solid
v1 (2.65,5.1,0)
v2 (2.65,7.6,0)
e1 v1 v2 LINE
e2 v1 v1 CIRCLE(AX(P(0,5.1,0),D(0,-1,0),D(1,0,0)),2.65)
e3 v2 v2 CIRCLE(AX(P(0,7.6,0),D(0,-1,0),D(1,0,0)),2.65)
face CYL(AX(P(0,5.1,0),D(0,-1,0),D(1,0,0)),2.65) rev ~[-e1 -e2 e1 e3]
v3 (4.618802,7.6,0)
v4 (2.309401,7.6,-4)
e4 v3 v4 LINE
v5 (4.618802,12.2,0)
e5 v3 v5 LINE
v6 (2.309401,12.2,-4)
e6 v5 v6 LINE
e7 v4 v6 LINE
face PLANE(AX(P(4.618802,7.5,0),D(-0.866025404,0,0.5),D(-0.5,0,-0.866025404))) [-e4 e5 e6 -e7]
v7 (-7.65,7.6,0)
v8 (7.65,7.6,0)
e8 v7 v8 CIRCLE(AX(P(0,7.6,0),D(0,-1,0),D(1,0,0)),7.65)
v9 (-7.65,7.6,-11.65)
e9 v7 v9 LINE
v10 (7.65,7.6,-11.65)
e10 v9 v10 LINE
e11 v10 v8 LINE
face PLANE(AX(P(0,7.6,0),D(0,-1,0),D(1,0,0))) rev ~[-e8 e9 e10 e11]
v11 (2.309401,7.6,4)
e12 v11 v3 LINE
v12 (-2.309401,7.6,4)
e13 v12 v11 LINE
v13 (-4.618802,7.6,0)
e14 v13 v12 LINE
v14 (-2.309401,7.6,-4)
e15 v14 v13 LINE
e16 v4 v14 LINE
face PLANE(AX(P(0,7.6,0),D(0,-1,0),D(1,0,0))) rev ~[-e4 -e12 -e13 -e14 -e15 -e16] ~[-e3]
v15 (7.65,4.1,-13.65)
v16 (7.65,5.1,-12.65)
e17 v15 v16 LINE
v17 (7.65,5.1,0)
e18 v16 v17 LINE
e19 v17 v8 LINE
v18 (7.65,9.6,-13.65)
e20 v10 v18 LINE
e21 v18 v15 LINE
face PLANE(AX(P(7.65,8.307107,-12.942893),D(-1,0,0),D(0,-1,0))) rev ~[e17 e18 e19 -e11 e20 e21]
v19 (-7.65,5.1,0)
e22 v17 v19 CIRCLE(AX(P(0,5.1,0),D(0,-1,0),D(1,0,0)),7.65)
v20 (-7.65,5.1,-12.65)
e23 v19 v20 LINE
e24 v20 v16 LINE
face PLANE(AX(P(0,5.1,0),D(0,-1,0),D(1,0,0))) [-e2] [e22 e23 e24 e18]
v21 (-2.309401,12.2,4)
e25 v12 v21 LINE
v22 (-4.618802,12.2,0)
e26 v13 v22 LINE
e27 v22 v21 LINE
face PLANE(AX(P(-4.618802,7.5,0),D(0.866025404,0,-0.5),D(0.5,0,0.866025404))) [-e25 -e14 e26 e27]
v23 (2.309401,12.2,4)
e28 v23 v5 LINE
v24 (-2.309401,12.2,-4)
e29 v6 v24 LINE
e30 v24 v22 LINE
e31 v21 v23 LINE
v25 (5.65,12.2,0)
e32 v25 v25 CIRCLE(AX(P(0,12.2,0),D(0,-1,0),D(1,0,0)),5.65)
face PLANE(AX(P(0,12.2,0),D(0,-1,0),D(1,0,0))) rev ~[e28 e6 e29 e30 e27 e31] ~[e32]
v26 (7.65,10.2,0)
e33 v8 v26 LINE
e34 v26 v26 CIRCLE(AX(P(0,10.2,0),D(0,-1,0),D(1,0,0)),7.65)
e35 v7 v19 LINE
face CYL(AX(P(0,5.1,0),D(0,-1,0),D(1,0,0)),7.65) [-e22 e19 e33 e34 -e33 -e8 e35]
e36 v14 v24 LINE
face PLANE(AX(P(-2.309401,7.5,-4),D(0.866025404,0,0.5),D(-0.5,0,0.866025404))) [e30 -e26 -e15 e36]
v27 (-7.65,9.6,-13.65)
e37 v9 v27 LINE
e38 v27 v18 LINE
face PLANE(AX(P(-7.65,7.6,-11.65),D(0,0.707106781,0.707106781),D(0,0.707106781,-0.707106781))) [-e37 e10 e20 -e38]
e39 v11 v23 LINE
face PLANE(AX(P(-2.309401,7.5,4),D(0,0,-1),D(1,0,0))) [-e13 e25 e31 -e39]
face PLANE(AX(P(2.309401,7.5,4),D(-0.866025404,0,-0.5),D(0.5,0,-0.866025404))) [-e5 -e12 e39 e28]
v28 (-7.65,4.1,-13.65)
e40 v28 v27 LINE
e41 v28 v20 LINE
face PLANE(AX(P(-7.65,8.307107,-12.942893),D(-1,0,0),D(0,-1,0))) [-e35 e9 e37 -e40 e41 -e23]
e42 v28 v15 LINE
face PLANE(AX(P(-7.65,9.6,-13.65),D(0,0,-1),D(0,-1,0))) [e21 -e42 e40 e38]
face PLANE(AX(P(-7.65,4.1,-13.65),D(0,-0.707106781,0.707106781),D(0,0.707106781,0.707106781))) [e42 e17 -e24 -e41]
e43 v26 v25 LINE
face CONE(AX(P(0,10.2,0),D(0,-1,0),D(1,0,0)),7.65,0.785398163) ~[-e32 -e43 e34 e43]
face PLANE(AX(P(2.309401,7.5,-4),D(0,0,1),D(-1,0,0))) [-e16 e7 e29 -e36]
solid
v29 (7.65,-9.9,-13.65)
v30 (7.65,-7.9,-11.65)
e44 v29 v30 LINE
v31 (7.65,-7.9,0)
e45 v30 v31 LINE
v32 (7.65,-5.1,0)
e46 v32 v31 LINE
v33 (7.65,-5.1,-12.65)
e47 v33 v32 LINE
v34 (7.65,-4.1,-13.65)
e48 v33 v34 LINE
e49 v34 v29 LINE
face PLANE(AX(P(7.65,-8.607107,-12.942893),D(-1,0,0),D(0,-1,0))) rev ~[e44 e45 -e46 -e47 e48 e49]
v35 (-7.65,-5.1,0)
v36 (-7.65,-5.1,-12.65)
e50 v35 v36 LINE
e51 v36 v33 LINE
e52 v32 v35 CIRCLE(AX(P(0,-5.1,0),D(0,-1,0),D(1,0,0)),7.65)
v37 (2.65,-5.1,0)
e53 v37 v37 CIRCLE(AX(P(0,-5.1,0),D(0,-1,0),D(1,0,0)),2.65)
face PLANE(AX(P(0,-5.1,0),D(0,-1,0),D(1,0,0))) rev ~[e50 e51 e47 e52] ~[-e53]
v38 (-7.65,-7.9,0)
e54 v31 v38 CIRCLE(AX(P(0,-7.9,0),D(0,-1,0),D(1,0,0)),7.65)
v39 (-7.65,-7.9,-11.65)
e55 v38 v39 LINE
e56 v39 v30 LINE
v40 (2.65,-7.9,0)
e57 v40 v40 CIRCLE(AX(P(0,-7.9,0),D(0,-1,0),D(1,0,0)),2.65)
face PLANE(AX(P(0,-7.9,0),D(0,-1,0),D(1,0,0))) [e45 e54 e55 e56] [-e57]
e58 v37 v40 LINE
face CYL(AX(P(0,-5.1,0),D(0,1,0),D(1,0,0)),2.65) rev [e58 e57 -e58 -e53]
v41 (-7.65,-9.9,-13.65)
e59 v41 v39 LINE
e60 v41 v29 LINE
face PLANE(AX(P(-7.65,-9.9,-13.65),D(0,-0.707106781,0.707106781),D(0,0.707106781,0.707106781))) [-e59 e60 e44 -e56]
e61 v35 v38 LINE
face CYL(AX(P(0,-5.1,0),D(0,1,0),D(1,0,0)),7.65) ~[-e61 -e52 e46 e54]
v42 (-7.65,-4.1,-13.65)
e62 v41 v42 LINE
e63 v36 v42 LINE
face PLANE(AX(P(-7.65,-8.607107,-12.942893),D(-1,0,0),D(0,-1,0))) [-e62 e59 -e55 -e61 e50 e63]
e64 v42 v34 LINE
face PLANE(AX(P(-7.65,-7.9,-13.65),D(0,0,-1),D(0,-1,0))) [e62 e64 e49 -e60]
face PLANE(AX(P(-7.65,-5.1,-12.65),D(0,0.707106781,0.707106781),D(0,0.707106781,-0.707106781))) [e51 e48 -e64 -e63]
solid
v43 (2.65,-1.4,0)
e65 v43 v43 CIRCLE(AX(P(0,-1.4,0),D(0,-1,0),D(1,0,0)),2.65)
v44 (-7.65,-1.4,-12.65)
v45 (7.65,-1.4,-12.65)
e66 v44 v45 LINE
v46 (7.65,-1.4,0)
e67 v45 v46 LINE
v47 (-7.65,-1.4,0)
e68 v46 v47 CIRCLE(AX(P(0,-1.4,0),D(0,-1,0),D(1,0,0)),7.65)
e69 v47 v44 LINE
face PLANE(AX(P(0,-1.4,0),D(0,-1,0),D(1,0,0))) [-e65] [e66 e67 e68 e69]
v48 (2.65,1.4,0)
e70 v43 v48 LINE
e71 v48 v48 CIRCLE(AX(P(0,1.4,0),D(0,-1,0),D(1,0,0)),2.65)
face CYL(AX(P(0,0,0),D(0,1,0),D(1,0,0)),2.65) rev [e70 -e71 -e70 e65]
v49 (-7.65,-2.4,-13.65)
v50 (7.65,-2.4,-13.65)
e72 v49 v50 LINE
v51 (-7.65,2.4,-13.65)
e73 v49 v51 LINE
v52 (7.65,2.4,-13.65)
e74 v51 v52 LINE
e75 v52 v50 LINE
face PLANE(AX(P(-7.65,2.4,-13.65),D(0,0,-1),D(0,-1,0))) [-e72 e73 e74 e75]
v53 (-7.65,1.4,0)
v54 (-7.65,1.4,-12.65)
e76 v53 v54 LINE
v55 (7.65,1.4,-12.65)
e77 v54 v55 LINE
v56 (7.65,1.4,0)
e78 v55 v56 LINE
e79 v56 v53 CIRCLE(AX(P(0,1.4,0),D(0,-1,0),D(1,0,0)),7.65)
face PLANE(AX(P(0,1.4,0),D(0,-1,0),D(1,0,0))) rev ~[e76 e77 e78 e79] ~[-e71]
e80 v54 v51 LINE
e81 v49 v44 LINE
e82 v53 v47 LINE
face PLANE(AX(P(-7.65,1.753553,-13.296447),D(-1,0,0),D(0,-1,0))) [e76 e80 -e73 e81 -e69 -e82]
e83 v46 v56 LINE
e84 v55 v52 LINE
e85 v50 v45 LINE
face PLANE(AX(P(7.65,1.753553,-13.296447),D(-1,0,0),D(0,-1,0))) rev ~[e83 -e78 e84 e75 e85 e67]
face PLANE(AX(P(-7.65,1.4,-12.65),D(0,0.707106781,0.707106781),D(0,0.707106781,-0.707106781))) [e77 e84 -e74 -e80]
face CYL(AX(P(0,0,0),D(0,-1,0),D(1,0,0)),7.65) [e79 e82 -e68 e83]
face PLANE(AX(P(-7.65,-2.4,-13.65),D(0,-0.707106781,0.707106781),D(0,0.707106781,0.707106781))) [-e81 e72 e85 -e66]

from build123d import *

# Parameters (mm, degrees)
F0_R      = 2.65
F1_DEPTH  = 1.4
F2_START  = 5.1
F2_DEPTH  = 2.8
F3_START  = -5.1
F3_DEPTH  = 2.5
F4_START  = -7.5
F4_DEPTH  = 4.7
F5_SIZE   = 2
F10_DEPTH = 15.3


# Not quite as in the source:
# - a feature names something its author has since deleted; it is built from what else it names


with BuildPart() as f1:
    # F0 (on Front) → F1 (new body, symmetric)
    with BuildSketch(Plane.XZ):
        with BuildLine():
            ThreePointArc((-7.65, 0), (0, -7.65), (7.65, 0))
            ThreePointArc((7.65, 0), (0, 7.65), (-7.65, 0))
        make_face()
        Polygon((2.3094010768, 4), (4.6188021535, 0), (2.3094010768, -4), (-2.3094010768, -4), (-4.6188021535, 0), (-2.3094010768, 4), align=None, mode=Mode.SUBTRACT)
        Polygon((2.3094010768, -4), (4.6188021535, 0), (2.3094010768, 4), (-2.3094010768, 4), (-4.6188021535, 0), (-2.3094010768, -4), align=None)
        Circle(F0_R, mode=Mode.SUBTRACT)
        with BuildLine():
            Line((7.65, -13.65), (7.65, 0))
            ThreePointArc((7.65, 0), (0, -7.65), (-7.65, 0))
            Line((-7.65, 0), (-7.65, -13.65))
            Line((-7.65, -13.65), (7.65, -13.65))
        make_face()
    extrude(amount=F1_DEPTH, both=True)

    # F9 (on face) → F10, piece 2 (join, through all)
    with BuildSketch(Plane(origin=(-7.65, 0, 0), x_dir=(0, -1, 0), z_dir=(-1, 0, 0))):
        Polygon((-2.4, -13.65), (-1.4, -13.65), (-1.4, -12.65), align=None)
        Polygon((1.4, -12.65), (1.4, -13.65), (2.4, -13.65), align=None)
    extrude(amount=-F10_DEPTH)


with BuildPart() as f2:
    # F0 (on Front) → F2 (new body)
    with BuildSketch(Plane.XZ.offset(F2_START)):
        with BuildLine():
            ThreePointArc((-7.65, 0), (0, -7.65), (7.65, 0))
            ThreePointArc((7.65, 0), (0, 7.65), (-7.65, 0))
        make_face()
        Polygon((2.3094010768, 4), (4.6188021535, 0), (2.3094010768, -4), (-2.3094010768, -4), (-4.6188021535, 0), (-2.3094010768, 4), align=None, mode=Mode.SUBTRACT)
        Polygon((2.3094010768, -4), (4.6188021535, 0), (2.3094010768, 4), (-2.3094010768, 4), (-4.6188021535, 0), (-2.3094010768, -4), align=None)
        Circle(F0_R, mode=Mode.SUBTRACT)
        with BuildLine():
            Line((7.65, -13.65), (7.65, 0))
            ThreePointArc((7.65, 0), (0, -7.65), (-7.65, 0))
            Line((-7.65, 0), (-7.65, -13.65))
            Line((-7.65, -13.65), (7.65, -13.65))
        make_face()
    extrude(amount=F2_DEPTH)

    # F7 (on face) + F9 (on face) → F10, piece 3 (join, through all)
    with BuildSketch(Plane(origin=(-7.65, 0, 0), x_dir=(0, -1, 0), z_dir=(-1, 0, 0))):
        Polygon((7.9, -11.65), (7.9, -13.65), (9.9, -13.65), align=None)
    with BuildSketch(Plane(origin=(-7.65, 0, 0), x_dir=(0, -1, 0), z_dir=(-1, 0, 0))):
        Polygon((4.1, -13.65), (5.1, -13.65), (5.1, -12.65), align=None)
    extrude(amount=-F10_DEPTH)


with BuildPart() as f3:
    # F0 (on Front) → F3 (new body)
    with BuildSketch(Plane.XZ.offset(F3_START)):
        with BuildLine():
            ThreePointArc((-7.65, 0), (0, -7.65), (7.65, 0))
            ThreePointArc((7.65, 0), (0, 7.65), (-7.65, 0))
        make_face()
        Polygon((2.3094010768, 4), (4.6188021535, 0), (2.3094010768, -4), (-2.3094010768, -4), (-4.6188021535, 0), (-2.3094010768, 4), align=None, mode=Mode.SUBTRACT)
        Polygon((2.3094010768, -4), (4.6188021535, 0), (2.3094010768, 4), (-2.3094010768, 4), (-4.6188021535, 0), (-2.3094010768, -4), align=None)
        Circle(F0_R, mode=Mode.SUBTRACT)
        with BuildLine():
            Line((7.65, -13.65), (7.65, 0))
            ThreePointArc((7.65, 0), (0, -7.65), (-7.65, 0))
            Line((-7.65, 0), (-7.65, -13.65))
            Line((-7.65, -13.65), (7.65, -13.65))
        make_face()
    extrude(amount=-F3_DEPTH)

    # F0 (on Front) → F4 (join)
    with BuildSketch(Plane.XZ.offset(F4_START)):
        with BuildLine():
            ThreePointArc((-7.65, 0), (0, -7.65), (7.65, 0))
            ThreePointArc((7.65, 0), (0, 7.65), (-7.65, 0))
        make_face()
        Polygon((2.3094010768, 4), (4.6188021535, 0), (2.3094010768, -4), (-2.3094010768, -4), (-4.6188021535, 0), (-2.3094010768, 4), align=None, mode=Mode.SUBTRACT)
    extrude(amount=-F4_DEPTH)

    # F5
    f5_edges = [f3.edges().sort_by_distance(p)[0] for p in [
        (-7.65, 12.2, 0),
    ]]
    chamfer(f5_edges, length=F5_SIZE)

    # F6 (on face) + F8 (on face) → F10 (join, through all)
    with BuildSketch(Plane(origin=(-7.65, 0, 0), x_dir=(0, -1, 0), z_dir=(-1, 0, 0))):
        Polygon((-9.6, -13.65), (-7.6, -13.65), (-7.6, -11.65), align=None)
    with BuildSketch(Plane(origin=(-7.65, 0, 0), x_dir=(0, -1, 0), z_dir=(-1, 0, 0))):
        Polygon((-5.1, -12.65), (-5.1, -13.65), (-4.1, -13.65), align=None)
    extrude(amount=-F10_DEPTH)


solid = Compound([f1.part, f2.part, f3.part])
